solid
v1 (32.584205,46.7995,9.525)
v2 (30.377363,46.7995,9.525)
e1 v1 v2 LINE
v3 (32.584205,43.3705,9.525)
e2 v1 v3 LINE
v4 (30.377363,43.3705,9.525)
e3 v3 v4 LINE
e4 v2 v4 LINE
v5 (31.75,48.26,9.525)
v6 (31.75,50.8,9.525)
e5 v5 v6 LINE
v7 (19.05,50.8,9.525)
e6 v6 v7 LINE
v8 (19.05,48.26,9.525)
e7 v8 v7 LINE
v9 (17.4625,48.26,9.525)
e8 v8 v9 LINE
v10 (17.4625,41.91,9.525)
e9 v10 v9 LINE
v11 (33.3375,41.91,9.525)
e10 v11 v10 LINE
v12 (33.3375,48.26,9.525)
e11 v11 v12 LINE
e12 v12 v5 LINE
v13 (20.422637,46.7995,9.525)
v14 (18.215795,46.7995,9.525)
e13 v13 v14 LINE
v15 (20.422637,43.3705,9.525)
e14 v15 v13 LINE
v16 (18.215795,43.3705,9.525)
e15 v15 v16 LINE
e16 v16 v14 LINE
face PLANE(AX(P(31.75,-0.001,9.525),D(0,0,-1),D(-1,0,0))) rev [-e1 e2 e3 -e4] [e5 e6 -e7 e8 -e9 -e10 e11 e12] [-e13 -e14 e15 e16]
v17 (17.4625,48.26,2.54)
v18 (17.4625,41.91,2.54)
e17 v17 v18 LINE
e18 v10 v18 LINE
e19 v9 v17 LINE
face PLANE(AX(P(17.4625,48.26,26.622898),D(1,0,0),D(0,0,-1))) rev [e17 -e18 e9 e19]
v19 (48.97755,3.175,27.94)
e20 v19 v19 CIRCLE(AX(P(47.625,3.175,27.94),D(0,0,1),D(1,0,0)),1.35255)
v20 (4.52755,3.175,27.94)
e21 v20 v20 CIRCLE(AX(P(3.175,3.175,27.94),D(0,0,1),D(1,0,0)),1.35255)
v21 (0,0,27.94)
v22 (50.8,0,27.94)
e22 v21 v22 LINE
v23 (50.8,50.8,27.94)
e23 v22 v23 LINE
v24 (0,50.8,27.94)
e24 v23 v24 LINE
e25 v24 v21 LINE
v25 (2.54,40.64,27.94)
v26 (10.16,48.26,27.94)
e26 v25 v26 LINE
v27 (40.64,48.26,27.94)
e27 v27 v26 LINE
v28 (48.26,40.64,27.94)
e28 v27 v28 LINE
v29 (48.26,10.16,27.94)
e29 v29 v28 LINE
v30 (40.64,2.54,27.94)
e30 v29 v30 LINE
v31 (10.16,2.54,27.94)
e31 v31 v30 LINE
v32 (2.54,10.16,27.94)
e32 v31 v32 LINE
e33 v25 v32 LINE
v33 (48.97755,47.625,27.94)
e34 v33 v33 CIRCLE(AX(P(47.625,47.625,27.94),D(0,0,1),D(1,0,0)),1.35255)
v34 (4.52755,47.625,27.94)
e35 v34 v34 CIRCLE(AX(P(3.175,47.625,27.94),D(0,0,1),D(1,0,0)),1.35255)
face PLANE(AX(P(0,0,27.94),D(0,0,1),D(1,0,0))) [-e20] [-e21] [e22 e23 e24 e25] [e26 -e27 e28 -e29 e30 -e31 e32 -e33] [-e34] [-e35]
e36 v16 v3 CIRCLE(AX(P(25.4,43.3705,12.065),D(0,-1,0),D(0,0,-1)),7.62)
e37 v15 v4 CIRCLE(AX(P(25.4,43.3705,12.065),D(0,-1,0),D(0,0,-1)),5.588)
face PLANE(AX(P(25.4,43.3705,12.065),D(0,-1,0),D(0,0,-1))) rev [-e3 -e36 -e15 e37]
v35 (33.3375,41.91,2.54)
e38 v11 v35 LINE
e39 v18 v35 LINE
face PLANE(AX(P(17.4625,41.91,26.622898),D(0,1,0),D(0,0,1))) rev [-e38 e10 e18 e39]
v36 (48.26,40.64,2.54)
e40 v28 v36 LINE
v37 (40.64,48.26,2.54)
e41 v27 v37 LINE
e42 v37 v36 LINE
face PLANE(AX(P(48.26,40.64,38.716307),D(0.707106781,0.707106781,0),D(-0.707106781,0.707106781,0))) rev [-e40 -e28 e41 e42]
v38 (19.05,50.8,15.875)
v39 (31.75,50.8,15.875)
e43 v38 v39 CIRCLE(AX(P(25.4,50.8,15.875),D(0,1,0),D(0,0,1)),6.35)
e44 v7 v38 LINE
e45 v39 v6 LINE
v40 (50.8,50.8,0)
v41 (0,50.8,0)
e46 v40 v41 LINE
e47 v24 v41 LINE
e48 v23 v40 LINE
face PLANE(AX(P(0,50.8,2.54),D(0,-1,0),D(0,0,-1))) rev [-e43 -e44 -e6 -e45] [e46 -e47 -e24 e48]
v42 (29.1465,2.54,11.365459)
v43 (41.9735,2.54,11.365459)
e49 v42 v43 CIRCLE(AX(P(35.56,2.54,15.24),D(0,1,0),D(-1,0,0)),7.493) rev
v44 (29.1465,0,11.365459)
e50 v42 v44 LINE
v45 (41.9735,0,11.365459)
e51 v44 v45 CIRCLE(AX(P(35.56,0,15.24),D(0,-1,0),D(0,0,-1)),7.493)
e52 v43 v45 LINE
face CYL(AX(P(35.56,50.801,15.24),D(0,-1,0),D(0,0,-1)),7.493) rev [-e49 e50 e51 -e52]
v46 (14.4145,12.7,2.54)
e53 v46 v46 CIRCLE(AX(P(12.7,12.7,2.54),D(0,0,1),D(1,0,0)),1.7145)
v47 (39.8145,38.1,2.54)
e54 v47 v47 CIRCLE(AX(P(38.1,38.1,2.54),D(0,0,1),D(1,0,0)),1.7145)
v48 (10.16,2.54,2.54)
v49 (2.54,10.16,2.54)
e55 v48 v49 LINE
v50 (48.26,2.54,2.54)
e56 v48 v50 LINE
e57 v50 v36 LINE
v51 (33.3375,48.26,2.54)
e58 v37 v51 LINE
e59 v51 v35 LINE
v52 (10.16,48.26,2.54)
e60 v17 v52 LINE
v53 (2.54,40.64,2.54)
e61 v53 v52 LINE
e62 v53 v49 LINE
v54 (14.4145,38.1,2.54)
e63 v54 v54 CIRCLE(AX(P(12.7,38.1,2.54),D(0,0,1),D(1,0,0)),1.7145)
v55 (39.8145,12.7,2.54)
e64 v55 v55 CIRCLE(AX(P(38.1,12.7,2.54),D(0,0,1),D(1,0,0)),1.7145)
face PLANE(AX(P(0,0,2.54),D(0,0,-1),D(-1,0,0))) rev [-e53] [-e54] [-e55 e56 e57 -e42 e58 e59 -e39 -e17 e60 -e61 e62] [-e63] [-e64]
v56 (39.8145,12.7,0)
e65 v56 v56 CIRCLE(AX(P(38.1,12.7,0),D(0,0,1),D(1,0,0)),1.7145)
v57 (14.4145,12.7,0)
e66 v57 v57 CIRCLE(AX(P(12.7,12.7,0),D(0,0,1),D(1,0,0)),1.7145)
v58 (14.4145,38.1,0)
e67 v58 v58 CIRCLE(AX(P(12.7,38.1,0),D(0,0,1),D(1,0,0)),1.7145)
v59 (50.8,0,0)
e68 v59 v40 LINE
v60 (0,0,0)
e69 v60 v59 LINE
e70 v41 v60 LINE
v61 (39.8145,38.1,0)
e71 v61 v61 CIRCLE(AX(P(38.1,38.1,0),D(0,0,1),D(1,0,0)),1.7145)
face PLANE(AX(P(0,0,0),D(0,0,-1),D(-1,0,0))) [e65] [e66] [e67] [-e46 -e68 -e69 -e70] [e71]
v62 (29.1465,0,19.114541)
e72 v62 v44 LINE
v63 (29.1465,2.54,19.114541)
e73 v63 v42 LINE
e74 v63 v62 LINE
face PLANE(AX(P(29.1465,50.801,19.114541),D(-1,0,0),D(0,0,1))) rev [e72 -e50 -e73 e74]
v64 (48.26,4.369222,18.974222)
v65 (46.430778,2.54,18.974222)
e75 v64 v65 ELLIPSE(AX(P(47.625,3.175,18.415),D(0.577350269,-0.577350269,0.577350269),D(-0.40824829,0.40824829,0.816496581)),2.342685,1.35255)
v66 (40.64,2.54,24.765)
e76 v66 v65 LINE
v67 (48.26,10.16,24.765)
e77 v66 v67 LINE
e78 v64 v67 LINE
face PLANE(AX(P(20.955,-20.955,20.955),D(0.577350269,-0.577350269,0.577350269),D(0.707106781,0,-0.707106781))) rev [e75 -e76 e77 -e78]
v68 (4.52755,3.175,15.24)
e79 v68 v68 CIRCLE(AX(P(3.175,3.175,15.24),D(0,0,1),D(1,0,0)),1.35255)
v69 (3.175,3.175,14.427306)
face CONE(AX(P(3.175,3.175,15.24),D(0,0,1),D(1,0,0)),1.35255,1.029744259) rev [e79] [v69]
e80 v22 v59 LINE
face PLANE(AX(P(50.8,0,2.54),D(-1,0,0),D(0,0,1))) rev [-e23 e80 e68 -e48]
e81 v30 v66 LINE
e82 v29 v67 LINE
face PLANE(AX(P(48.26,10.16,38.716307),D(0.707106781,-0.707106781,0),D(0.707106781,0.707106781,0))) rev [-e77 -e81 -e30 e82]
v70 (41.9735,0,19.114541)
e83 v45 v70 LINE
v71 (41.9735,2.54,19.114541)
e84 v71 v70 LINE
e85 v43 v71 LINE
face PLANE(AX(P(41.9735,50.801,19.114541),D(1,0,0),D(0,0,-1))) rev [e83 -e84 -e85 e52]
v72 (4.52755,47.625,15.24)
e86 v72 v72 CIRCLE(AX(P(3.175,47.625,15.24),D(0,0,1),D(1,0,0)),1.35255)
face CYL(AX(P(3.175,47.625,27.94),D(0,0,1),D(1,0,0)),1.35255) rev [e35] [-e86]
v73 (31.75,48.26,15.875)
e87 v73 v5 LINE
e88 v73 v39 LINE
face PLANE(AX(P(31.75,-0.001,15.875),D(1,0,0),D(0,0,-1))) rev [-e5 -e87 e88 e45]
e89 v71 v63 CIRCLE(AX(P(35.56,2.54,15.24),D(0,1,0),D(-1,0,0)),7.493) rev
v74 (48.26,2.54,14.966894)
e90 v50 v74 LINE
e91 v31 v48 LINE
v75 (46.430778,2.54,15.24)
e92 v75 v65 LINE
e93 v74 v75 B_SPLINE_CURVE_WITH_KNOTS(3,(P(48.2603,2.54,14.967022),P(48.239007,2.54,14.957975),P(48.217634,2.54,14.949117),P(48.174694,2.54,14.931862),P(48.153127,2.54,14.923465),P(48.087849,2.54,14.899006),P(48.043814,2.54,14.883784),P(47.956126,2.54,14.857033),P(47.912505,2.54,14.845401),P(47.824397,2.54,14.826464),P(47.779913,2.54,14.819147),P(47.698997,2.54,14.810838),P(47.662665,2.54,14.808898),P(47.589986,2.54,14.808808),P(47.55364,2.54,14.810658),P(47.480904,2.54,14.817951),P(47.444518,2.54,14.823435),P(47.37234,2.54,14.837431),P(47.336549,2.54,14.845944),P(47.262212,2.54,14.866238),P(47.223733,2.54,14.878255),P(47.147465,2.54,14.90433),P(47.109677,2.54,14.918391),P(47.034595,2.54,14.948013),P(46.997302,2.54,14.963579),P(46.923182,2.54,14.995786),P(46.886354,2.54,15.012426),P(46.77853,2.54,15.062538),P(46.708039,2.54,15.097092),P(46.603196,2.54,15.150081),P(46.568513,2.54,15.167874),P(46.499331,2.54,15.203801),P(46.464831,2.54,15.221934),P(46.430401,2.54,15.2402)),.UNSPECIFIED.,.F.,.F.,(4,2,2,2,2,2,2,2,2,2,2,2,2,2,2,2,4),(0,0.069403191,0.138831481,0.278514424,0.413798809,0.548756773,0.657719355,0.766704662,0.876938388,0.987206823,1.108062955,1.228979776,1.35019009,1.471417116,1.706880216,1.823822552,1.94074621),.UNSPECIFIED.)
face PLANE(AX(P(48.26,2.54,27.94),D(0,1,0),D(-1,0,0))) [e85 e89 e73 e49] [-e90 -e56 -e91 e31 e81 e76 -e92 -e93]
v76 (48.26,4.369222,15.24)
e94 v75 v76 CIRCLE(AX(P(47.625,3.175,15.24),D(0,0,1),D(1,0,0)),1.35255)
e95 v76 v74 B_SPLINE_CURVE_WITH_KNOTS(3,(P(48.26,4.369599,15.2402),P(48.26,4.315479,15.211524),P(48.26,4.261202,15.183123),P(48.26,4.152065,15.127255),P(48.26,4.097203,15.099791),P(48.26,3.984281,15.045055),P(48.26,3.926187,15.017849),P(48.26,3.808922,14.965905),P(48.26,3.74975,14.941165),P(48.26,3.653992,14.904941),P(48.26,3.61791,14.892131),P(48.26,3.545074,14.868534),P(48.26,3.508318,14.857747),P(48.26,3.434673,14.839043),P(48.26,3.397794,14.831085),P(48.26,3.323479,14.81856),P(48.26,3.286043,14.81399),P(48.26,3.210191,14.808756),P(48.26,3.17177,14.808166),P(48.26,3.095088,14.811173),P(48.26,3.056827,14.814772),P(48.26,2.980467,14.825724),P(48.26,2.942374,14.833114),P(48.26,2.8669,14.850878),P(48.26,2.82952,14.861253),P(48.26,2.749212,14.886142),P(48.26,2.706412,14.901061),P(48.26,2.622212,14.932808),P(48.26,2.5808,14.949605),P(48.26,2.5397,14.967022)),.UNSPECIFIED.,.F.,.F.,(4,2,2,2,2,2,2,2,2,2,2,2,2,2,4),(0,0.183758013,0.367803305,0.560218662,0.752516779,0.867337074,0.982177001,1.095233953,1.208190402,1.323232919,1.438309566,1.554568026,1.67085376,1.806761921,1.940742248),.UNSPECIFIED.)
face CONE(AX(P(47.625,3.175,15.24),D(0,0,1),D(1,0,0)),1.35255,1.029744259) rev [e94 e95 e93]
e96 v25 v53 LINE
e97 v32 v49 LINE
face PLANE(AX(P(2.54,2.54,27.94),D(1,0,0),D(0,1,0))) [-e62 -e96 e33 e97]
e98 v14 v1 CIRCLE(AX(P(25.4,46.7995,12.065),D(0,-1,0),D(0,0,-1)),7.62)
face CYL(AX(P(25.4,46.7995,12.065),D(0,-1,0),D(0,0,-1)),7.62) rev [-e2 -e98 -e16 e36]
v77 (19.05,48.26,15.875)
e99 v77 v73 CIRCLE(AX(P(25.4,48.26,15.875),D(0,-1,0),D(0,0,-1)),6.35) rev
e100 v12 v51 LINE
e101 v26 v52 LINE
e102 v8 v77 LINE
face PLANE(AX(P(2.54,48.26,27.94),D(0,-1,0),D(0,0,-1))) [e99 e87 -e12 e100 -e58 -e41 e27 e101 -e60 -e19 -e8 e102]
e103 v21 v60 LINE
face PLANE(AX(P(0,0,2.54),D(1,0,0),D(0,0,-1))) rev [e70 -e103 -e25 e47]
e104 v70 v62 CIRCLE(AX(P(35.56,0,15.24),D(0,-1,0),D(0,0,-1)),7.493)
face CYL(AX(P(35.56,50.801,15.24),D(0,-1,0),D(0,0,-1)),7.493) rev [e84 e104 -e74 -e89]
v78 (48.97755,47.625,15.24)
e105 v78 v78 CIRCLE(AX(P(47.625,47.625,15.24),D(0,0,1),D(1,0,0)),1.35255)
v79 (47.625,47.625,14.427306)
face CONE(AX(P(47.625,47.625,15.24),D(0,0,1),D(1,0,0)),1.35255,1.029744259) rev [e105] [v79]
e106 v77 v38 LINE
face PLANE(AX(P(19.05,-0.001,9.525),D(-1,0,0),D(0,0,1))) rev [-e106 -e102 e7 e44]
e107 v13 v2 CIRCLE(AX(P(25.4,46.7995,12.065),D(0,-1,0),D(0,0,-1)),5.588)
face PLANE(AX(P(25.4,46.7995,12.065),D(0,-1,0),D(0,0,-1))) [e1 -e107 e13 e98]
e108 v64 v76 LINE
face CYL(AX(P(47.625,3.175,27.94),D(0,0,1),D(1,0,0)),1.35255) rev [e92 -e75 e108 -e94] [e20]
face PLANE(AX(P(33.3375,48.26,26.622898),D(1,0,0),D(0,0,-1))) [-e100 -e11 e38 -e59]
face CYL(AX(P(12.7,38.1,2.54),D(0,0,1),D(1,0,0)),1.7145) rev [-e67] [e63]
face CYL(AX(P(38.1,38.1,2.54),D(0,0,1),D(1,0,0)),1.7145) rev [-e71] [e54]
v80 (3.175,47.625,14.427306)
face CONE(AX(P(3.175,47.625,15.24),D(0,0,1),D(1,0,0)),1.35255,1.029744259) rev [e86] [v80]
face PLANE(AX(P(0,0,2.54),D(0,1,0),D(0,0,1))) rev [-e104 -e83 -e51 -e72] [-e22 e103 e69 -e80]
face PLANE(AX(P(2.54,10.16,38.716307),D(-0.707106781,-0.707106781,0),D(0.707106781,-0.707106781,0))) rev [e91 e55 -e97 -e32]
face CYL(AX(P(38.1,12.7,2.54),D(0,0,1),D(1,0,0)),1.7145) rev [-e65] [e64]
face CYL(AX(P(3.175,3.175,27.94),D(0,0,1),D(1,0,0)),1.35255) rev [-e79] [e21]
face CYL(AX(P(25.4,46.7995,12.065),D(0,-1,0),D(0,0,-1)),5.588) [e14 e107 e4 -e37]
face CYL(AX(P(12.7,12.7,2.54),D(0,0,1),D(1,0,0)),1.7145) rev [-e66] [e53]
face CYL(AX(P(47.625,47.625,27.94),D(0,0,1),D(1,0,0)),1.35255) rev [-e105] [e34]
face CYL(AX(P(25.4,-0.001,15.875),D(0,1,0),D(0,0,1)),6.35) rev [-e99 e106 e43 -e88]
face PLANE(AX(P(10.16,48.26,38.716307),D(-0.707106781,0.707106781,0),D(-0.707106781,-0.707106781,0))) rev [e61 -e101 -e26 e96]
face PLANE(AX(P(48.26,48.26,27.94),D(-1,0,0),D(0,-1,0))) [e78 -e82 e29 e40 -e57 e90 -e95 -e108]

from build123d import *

# Parameters (mm, degrees)
SKETCH1_W                 = 50.8
SKETCH1_H                 = 50.8
BOSS_EXTRUDE1_DEPTH       = 2.54
SKETCH2_W                 = 50.8
SKETCH2_H                 = 50.8
SKETCH2_W_2               = 45.72
SKETCH2_H_2               = 45.72
BOSS_EXTRUDE2_DEPTH       = 25.4
CUT_EXTRUDE1_REACH        = 79.084
CUT_EXTRUDE3_REACH        = 79.084
BOSS_EXTRUDE3_DEPTH       = 25.4
CUT_EXTRUDE4_START        = -2.54
SKETCH8_W                 = 22.225
SKETCH8_H                 = 7.62
CUT_EXTRUDE4_DEPTH        = 12.7
LOFT1_START               = 36.295124673
LOFT1_DEPTH               = 4.399409051
F_6_32_TAPPED_HOLE1_D     = 2.7051
F_6_32_TAPPED_HOLE1_DEPTH = 12.7
F_6_32_TAPPED_HOLE1_TIP   = 0.81269403
F_6_CLEARANCE_HOLE1_D     = 3.429
SKETCH15_W                = 15.875
SKETCH15_H                = 6.35
BOSS_EXTRUDE5_DEPTH       = 6.985
CUT_EXTRUDE5_START        = -3.175
SKETCH16_R                = 7.62
SKETCH16_R_2              = 5.588
CUT_EXTRUDE5_DEPTH        = 1.7145


with BuildPart() as part:
    # Sketch1 → Boss-Extrude1 (new body)
    with BuildSketch(Plane.XY):
        with Locations((25.4, 25.4)):
            Rectangle(SKETCH1_W, SKETCH1_H)
    extrude(amount=BOSS_EXTRUDE1_DEPTH)

    # Sketch2 → Boss-Extrude2 (add)
    with BuildSketch(Plane.XY.offset(2.54)):
        with Locations((25.4, 25.4)):
            Rectangle(SKETCH2_W, SKETCH2_H)
        with Locations((25.4, 25.4)):
            Rectangle(SKETCH2_W_2, SKETCH2_H_2, mode=Mode.SUBTRACT)
    extrude(amount=BOSS_EXTRUDE2_DEPTH)

    # Sketch3 → Cut-Extrude1 (cut, up to next)
    with BuildSketch(Plane.XZ, mode=Mode.PRIVATE) as cut_extrude1_sk1:
        with BuildLine():
            Line((29.1465, 19.114540844), (29.1465, 11.365459156))
            ThreePointArc((29.1465, 11.365459156), (35.56, 7.747), (41.9735, 11.365459156))
            Line((41.9735, 11.365459156), (41.9735, 19.114540844))
            ThreePointArc((41.9735, 19.114540844), (35.56, 22.733), (29.1465, 19.114540844))
        make_face()
    cut_extrude1_tool1 = extrude(cut_extrude1_sk1.sketch, amount=-CUT_EXTRUDE1_REACH, mode=Mode.PRIVATE) & part.part
    add(cut_extrude1_tool1.solids().sort_by_distance((35.56, 0, 15.24))[0], mode=Mode.SUBTRACT)

    # Sketch4 → Cut-Extrude3 (cut, up to next)
    with BuildSketch(Plane(origin=(0, 50.8, 0), x_dir=(1, 0, 0), z_dir=(0, 1, 0)), mode=Mode.PRIVATE) as cut_extrude3_sk1:
        with BuildLine():
            Line((31.75, -15.875), (31.75, -9.525))
            Line((31.75, -9.525), (19.05, -9.525))
            Line((19.05, -9.525), (19.05, -15.875))
            ThreePointArc((19.05, -15.875), (25.4, -22.225), (31.75, -15.875))
        make_face()
    cut_extrude3_tool1 = extrude(cut_extrude3_sk1.sketch, amount=-CUT_EXTRUDE3_REACH, mode=Mode.PRIVATE) & part.part
    add(cut_extrude3_tool1.solids().sort_by_distance((25.4, 50.8, 15.282228))[0], mode=Mode.SUBTRACT)

    # Sketch6 → Boss-Extrude3 (add)
    with BuildSketch(Plane.XY.offset(2.54)):
        Polygon((2.54, 48.26), (10.16, 48.26), (2.54, 40.64), align=None)
        Polygon((48.26, 48.26), (48.26, 40.64), (40.64, 48.26), align=None)
        Polygon((48.26, 2.54), (48.26, 10.16), (40.64, 2.54), align=None)
        Polygon((2.54, 2.54), (2.54, 10.16), (10.16, 2.54), align=None)
    extrude(amount=BOSS_EXTRUDE3_DEPTH)

    # Sketch8 → Cut-Extrude4 (cut)
    with BuildSketch(Plane(origin=(50.8, 0, 0), x_dir=(0, 0, -1), z_dir=(1, 0, 0)).offset(CUT_EXTRUDE4_START)):
        with Locations((-13.6525, 6.35)):
            Rectangle(SKETCH8_W, SKETCH8_H)
    extrude(amount=-CUT_EXTRUDE4_DEPTH, mode=Mode.SUBTRACT)

    # Loft1: read off the stored shape, not the designer's step
    # Loft1 outline → Loft1 (add)
    with BuildSketch(Plane(origin=(0, 0, 0), x_dir=(0.8164965809277258, 0.40824829046386313, -0.40824829046386313), z_dir=(0.5773502691896258, -0.5773502691896258, 0.5773502691896258)).offset(LOFT1_START)):
        Polygon((33.441658713, 24.695704333), (24.109102793, 19.30755066), (33.441658713, 13.919396988), align=None)
    extrude(amount=LOFT1_DEPTH)

    # #6-32 Tapped Hole1
    with Locations(Plane.XY.offset(27.94)):
        with Locations((47.625, 3.175), (47.625, 47.625), (3.175, 47.625), (3.175, 3.175)):
            Hole(F_6_32_TAPPED_HOLE1_D / 2, depth=F_6_32_TAPPED_HOLE1_DEPTH)
            with Locations((0, 0, -(F_6_32_TAPPED_HOLE1_DEPTH + F_6_32_TAPPED_HOLE1_TIP / 2))):  # 118° drill point
                Cone(0, F_6_32_TAPPED_HOLE1_D / 2, F_6_32_TAPPED_HOLE1_TIP, mode=Mode.SUBTRACT)

    # #6 Clearance Hole1 (through all)
    with Locations(Plane.XY.offset(2.54)):
        with Locations((12.7, 38.1), (38.1, 38.1), (38.1, 12.7), (12.7, 12.7)):
            Hole(F_6_CLEARANCE_HOLE1_D / 2)

    # Sketch15 → Boss-Extrude5 (add)
    with BuildSketch(Plane.XY.offset(2.54)):
        with Locations((25.4, 45.085)):
            Rectangle(SKETCH15_W, SKETCH15_H)
    extrude(amount=BOSS_EXTRUDE5_DEPTH)

    # Sketch16 → Cut-Extrude5 (cut, symmetric)
    with BuildSketch(Plane.XZ.offset(-41.91).offset(CUT_EXTRUDE5_START)):
        with Locations((25.4, 12.065)):
            Circle(SKETCH16_R)
        with Locations((25.4, 12.065)):
            Circle(SKETCH16_R_2, mode=Mode.SUBTRACT)
    extrude(amount=CUT_EXTRUDE5_DEPTH, both=True, mode=Mode.SUBTRACT)


solid = part.part
